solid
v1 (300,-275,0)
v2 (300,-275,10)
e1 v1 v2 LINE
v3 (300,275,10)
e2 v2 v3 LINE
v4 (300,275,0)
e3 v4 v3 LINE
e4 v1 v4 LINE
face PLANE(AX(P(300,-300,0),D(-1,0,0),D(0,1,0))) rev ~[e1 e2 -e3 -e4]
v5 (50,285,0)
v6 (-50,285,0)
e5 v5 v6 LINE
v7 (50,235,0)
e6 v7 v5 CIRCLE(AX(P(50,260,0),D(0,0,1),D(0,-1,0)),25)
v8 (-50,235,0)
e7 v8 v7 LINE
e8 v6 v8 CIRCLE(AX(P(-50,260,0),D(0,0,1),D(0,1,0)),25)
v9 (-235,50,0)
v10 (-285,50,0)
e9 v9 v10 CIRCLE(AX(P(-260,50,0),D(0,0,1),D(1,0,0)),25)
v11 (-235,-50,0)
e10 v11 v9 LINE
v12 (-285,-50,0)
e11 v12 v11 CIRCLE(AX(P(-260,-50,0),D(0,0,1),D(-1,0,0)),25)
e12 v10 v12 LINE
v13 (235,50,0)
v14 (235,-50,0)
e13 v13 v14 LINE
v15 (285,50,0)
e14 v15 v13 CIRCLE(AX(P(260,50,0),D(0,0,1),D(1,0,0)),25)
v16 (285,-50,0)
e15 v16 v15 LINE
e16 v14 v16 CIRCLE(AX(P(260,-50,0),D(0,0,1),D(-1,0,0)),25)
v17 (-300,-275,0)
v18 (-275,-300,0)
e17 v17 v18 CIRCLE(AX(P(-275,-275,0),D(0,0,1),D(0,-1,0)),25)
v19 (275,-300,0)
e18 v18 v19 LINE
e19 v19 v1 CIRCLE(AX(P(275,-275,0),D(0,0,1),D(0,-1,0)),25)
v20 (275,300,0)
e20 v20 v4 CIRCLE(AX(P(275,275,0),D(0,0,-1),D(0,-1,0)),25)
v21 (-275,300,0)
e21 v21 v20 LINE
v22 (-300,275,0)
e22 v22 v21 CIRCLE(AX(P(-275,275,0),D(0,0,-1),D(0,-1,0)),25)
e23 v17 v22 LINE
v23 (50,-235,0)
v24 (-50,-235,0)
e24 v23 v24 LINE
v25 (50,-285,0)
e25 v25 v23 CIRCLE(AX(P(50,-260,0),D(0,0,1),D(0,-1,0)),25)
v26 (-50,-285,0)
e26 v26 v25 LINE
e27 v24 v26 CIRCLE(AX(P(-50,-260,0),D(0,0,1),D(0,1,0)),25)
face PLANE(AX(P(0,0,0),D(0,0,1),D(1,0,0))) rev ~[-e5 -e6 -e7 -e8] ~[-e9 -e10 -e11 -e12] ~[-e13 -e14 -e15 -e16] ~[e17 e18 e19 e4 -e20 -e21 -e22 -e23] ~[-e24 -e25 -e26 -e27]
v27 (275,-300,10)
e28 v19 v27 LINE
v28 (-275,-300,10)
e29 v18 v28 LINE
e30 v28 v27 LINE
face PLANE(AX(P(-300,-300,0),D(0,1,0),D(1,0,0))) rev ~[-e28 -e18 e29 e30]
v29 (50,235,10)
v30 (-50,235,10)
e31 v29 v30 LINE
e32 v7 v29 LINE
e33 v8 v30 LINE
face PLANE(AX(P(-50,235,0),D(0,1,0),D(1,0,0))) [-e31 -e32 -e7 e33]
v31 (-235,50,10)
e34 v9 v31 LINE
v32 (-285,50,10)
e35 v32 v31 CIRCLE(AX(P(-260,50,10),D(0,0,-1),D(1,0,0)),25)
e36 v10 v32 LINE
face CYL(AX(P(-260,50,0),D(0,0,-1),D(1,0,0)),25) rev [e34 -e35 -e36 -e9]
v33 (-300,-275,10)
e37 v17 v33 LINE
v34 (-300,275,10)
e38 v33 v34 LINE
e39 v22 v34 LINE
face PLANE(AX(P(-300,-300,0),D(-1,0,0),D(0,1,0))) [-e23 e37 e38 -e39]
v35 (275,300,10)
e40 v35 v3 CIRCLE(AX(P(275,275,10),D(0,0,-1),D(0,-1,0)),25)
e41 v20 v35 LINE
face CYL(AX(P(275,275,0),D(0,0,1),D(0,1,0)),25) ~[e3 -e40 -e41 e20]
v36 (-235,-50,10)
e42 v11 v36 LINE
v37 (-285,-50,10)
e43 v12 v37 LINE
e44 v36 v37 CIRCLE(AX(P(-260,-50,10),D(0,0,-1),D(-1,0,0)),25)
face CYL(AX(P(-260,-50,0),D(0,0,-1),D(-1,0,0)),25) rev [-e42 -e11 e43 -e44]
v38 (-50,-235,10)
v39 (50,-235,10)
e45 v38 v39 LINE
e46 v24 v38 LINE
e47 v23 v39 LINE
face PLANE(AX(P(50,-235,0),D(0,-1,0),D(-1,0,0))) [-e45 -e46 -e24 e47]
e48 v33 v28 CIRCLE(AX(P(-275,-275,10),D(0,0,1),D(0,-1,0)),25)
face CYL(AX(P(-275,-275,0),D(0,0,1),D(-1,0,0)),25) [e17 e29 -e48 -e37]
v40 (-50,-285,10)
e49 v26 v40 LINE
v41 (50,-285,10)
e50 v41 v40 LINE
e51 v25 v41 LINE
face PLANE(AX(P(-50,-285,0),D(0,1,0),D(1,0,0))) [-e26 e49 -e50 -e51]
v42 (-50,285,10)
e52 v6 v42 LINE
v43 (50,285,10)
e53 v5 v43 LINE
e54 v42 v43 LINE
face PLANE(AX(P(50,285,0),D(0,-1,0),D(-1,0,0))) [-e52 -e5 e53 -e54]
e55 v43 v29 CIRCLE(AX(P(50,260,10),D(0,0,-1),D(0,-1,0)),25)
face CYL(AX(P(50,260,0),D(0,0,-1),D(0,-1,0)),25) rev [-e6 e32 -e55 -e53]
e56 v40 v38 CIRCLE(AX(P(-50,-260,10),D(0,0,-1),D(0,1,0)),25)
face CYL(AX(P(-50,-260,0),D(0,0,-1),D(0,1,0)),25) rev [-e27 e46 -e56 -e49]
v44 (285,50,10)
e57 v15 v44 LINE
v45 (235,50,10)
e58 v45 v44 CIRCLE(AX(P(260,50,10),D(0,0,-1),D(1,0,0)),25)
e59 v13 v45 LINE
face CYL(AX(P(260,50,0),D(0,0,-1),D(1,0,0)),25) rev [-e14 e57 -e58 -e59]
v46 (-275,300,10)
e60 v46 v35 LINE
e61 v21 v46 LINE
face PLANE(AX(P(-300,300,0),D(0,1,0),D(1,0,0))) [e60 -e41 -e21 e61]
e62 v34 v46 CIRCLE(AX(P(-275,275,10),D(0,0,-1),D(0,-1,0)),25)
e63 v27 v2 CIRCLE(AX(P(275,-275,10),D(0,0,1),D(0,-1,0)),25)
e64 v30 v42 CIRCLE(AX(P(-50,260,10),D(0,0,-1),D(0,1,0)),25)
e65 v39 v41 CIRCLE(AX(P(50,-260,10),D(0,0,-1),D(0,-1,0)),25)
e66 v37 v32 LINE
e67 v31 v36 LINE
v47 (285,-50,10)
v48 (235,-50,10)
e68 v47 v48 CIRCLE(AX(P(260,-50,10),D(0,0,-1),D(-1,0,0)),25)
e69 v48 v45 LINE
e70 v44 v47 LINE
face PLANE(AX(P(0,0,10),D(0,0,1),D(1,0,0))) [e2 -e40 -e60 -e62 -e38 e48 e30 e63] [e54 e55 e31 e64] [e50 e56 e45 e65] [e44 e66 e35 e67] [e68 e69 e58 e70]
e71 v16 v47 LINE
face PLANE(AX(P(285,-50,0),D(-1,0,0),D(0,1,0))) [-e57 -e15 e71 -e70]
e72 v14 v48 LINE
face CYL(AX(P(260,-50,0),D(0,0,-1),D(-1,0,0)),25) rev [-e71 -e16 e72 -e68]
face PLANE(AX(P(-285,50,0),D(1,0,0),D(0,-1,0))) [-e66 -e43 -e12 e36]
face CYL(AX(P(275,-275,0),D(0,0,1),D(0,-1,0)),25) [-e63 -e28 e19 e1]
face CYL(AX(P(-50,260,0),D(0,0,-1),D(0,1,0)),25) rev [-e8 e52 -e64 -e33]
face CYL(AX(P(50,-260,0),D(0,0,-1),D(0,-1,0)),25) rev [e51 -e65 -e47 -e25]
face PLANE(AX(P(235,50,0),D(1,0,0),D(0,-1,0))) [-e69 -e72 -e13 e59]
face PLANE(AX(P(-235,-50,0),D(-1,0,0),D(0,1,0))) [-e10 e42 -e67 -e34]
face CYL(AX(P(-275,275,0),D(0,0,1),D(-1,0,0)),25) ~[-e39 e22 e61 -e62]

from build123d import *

# Parameters (mm, degrees)
F0_W            = 600
F0_H            = 600
F1_DEPTH        = 10
F3_DEPTH        = 10.001
F3_COPIES_COUNT = 4
F5_R            = 25


# Not quite as in the source:
# - a pattern or mirror of a feature is missing from the dataset's text; its kind, count and spacing are read off the source's solid


with BuildPart() as f1:
    # F0 (on Top) → F1 (new body)
    with BuildSketch(Plane.XY):
        Rectangle(F0_W, F0_H)
    extrude(amount=F1_DEPTH)

    # F2 (on Top) → F3 (cut, through all)
    with BuildSketch(Plane.XY):
        with BuildLine():
            Line((-50, 235), (50, 235))
            ThreePointArc((50, 235), (75, 260), (50, 285))
            Line((50, 285), (-50, 285))
            ThreePointArc((-50, 285), (-75, 260), (-50, 235))
        make_face()
    f3 = extrude(amount=F3_DEPTH, mode=Mode.SUBTRACT)

    # F3_copies: F3 ×4 about axis
    f3_copies_axis = Axis((0, 0, 0), (0, 0, 1))
    for i in range(1, F3_COPIES_COUNT):
        add(f3.rotate(f3_copies_axis, i * 360 / F3_COPIES_COUNT), mode=Mode.SUBTRACT)

    # F5
    f5_edges = [f1.edges().sort_by_distance(p)[0] for p in [
        (-300, -300, 5),
        (-300, 300, 5),
        (300, 300, 5),
        (300, -300, 5),
    ]]
    fillet(f5_edges, radius=F5_R)


solid = f1.part
